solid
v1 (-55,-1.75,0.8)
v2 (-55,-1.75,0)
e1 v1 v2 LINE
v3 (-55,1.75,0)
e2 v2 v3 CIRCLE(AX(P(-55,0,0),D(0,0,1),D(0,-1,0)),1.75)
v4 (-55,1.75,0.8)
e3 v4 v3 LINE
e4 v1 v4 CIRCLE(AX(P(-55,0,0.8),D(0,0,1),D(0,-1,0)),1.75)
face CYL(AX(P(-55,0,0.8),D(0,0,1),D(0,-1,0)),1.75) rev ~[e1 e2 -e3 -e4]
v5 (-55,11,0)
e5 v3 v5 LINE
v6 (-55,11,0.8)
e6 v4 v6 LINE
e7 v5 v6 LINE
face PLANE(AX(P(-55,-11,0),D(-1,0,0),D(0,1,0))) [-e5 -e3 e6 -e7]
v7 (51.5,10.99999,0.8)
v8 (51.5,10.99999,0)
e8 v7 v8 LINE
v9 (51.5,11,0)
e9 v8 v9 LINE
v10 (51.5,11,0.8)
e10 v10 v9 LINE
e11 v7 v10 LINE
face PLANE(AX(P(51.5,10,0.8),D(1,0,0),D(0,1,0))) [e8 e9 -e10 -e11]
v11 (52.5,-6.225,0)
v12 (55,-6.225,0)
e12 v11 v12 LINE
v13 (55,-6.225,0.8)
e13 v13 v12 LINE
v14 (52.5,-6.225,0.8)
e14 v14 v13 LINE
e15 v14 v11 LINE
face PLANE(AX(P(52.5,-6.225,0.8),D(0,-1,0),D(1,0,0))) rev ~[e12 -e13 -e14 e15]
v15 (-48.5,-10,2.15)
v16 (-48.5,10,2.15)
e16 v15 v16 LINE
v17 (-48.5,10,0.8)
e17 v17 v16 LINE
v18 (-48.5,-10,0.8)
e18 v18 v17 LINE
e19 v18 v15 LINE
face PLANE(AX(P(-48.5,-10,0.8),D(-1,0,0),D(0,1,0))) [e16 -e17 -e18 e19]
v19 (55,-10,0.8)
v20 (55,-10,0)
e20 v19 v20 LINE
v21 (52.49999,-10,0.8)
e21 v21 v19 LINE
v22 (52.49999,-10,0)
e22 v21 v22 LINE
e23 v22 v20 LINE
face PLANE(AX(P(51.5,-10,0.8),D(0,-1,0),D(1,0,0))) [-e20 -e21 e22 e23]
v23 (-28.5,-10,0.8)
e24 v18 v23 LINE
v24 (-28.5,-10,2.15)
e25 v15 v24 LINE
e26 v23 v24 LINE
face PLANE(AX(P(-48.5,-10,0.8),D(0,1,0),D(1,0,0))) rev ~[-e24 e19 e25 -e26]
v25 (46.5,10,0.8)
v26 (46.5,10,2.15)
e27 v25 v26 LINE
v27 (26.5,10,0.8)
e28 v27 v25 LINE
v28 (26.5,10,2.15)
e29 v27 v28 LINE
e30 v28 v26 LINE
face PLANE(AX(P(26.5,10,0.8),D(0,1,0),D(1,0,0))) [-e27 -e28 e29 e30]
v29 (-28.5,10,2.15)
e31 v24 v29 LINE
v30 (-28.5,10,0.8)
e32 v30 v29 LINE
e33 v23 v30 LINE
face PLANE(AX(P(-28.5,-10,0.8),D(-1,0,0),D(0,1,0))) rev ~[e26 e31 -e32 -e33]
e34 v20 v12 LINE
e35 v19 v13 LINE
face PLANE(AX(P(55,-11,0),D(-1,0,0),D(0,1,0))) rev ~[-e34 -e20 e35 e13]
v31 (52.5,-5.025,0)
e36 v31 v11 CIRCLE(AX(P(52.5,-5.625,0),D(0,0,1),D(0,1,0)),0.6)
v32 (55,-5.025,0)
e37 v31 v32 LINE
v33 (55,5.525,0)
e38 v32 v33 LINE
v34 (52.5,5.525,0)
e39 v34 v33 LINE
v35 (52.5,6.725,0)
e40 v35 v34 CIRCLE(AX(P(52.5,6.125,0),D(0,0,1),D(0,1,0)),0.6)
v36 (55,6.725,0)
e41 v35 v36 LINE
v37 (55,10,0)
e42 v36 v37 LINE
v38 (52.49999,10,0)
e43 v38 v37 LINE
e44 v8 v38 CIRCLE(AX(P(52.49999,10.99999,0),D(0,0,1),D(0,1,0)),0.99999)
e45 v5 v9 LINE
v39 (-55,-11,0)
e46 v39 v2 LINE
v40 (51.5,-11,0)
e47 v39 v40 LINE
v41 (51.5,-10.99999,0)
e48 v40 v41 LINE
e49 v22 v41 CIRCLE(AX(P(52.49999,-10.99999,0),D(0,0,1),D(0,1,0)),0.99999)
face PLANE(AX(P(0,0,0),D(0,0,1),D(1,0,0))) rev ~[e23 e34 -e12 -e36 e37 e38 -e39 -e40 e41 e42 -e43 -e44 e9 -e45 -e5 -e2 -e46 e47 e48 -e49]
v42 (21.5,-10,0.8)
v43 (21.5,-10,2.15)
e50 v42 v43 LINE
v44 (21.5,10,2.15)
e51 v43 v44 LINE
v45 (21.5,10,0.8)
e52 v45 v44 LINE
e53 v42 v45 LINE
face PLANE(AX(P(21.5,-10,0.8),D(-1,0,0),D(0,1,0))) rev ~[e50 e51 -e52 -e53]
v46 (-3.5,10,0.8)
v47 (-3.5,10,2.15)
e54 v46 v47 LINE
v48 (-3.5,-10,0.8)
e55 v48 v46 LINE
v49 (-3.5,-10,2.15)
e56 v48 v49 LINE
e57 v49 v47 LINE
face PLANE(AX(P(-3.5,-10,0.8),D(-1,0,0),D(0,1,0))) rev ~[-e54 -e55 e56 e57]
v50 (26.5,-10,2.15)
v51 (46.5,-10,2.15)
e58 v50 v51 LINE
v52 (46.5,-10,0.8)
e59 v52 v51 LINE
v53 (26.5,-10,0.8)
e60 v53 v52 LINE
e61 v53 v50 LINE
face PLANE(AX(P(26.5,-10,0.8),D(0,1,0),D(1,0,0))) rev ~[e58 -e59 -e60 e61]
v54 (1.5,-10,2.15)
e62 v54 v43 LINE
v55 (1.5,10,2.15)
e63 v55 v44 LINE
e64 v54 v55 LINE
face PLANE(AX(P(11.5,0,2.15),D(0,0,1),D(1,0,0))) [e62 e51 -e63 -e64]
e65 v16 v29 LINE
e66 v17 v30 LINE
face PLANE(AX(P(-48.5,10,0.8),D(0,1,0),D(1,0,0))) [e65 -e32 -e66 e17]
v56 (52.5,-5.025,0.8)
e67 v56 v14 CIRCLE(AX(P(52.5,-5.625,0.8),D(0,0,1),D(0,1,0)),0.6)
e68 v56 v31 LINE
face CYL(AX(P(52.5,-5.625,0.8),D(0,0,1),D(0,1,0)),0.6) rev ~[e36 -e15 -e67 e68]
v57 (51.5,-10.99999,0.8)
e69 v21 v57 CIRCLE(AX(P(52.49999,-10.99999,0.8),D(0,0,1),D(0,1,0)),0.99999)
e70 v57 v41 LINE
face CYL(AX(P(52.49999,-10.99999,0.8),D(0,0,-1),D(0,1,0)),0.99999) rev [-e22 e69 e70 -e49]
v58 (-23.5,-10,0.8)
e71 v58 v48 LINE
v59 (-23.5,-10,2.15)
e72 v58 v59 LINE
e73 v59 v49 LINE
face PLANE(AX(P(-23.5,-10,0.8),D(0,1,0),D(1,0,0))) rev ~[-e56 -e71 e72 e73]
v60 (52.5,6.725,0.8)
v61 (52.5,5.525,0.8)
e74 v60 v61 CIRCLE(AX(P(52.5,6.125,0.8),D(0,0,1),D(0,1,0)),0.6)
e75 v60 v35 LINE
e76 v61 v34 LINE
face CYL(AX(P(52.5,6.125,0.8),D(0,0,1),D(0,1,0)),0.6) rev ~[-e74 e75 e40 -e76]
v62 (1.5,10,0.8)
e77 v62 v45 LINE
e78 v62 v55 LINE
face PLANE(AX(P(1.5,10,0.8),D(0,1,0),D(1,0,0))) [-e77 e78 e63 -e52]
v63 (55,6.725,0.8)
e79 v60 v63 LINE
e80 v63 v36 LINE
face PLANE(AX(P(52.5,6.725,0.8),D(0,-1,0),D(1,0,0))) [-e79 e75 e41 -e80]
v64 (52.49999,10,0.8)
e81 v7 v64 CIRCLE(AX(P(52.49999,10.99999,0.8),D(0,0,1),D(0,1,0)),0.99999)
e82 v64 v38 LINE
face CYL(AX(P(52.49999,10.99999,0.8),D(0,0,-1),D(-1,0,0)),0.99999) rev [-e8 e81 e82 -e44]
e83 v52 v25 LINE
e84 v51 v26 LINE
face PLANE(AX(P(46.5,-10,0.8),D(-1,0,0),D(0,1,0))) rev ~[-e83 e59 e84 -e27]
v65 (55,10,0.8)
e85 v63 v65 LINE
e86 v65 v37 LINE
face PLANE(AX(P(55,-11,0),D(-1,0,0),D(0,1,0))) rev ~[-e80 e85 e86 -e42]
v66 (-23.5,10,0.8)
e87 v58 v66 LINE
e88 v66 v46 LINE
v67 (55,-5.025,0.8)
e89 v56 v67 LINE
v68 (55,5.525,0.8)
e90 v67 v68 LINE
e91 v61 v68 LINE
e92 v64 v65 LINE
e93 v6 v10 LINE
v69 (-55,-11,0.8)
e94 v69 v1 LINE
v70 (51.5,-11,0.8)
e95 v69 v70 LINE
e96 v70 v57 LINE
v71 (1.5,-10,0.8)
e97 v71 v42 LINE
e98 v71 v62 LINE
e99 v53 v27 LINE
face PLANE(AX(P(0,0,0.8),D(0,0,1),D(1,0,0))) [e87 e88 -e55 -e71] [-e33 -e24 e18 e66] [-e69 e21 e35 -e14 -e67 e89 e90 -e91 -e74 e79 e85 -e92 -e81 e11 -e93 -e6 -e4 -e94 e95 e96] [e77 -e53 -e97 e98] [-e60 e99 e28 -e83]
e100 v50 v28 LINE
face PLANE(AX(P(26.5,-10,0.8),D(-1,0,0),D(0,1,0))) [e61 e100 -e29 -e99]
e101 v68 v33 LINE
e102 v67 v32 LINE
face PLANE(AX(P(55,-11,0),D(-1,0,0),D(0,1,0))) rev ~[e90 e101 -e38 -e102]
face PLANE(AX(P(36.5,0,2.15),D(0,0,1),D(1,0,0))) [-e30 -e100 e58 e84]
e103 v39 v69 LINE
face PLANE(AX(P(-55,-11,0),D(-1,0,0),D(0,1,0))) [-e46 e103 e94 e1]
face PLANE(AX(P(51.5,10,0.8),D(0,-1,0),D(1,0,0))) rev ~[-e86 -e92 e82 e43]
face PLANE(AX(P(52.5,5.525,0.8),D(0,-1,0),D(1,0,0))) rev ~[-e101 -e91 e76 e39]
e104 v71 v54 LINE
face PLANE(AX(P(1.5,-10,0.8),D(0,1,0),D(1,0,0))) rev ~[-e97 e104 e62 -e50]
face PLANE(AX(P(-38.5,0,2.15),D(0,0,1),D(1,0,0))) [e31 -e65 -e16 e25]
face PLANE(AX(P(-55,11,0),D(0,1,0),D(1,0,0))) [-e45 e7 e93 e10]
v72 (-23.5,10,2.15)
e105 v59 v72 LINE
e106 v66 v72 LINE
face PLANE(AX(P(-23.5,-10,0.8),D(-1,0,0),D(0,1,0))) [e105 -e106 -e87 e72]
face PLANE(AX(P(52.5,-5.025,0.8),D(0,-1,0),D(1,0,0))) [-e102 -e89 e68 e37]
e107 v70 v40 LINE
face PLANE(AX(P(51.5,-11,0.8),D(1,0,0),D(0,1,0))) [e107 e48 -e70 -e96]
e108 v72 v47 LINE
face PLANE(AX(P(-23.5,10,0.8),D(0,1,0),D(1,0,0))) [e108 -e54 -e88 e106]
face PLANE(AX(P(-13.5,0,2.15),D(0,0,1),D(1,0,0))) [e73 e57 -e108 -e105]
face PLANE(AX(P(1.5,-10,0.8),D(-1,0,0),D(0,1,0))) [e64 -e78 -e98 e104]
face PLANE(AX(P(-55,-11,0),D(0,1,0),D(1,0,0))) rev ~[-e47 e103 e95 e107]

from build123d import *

# Parameters (mm, degrees)
F0_W     = 110
F0_H     = 22
F1_DEPTH = 0.8
F2_W     = 3.5
F2_H     = 1
F2_W_2   = 2.5
F2_H_2   = 1.2
F3_DEPTH = 0.801
F4_R     = 0.99999
F2_W_3   = 20
F2_H_3   = 20
F5_DEPTH = 1.35


# Not quite as in the source:
# - a fillet or chamfer is up to 0.001 mm smaller than in the source, because OpenCascade refuses the exact size


with BuildPart() as f1:
    # F0 (on Top) → F1 (new body)
    with BuildSketch(Plane.XY):
        Rectangle(F0_W, F0_H)
    extrude(amount=F1_DEPTH)

    # F2 (on face) → F3 (cut, through all)
    with BuildSketch(Plane.XY.offset(0.8)):
        with BuildLine():
            Line((-55, 1.75), (-55, -1.75))
            ThreePointArc((-55, -1.75), (-53.25, 0), (-55, 1.75))
        make_face()
        with Locations((53.25, 10.5)):
            Rectangle(F2_W, F2_H)
        with Locations((53.25, -10.5)):
            Rectangle(F2_W, F2_H)
        with BuildLine():
            ThreePointArc((52.5, -5.025), (51.9, -5.625), (52.5, -6.225))
            Line((52.5, -6.225), (52.5, -5.025))
        make_face()
        with BuildLine():
            Line((52.5, 5.525), (52.5, 6.725))
            ThreePointArc((52.5, 6.725), (51.9, 6.125), (52.5, 5.525))
        make_face()
        with Locations((53.75, -5.625)):
            Rectangle(F2_W_2, F2_H_2)
        with Locations((53.75, 6.125)):
            Rectangle(F2_W_2, F2_H_2)
    extrude(amount=-F3_DEPTH, mode=Mode.SUBTRACT)

    # F4 (radius 1 in the source; OpenCascade refuses exactly that, so slightly less here)
    f4_edges = [f1.edges().sort_by_distance(p)[0] for p in [
        (51.5, -10, 0.4),
        (51.5, 10, 0.4),
    ]]
    fillet(f4_edges, radius=F4_R)

    # F2 (on face) → F5 (join)
    with BuildSketch(Plane.XY.offset(0.8)):
        with Locations((36.5, 0)):
            Rectangle(F2_W_3, F2_H_3)
        with Locations((11.5, 0)):
            Rectangle(F2_W_3, F2_H_3)
        with Locations((-13.5, 0)):
            Rectangle(F2_W_3, F2_H_3)
        with Locations((-38.5, 0)):
            Rectangle(F2_W_3, F2_H_3)
    extrude(amount=F5_DEPTH)


solid = f1.part
